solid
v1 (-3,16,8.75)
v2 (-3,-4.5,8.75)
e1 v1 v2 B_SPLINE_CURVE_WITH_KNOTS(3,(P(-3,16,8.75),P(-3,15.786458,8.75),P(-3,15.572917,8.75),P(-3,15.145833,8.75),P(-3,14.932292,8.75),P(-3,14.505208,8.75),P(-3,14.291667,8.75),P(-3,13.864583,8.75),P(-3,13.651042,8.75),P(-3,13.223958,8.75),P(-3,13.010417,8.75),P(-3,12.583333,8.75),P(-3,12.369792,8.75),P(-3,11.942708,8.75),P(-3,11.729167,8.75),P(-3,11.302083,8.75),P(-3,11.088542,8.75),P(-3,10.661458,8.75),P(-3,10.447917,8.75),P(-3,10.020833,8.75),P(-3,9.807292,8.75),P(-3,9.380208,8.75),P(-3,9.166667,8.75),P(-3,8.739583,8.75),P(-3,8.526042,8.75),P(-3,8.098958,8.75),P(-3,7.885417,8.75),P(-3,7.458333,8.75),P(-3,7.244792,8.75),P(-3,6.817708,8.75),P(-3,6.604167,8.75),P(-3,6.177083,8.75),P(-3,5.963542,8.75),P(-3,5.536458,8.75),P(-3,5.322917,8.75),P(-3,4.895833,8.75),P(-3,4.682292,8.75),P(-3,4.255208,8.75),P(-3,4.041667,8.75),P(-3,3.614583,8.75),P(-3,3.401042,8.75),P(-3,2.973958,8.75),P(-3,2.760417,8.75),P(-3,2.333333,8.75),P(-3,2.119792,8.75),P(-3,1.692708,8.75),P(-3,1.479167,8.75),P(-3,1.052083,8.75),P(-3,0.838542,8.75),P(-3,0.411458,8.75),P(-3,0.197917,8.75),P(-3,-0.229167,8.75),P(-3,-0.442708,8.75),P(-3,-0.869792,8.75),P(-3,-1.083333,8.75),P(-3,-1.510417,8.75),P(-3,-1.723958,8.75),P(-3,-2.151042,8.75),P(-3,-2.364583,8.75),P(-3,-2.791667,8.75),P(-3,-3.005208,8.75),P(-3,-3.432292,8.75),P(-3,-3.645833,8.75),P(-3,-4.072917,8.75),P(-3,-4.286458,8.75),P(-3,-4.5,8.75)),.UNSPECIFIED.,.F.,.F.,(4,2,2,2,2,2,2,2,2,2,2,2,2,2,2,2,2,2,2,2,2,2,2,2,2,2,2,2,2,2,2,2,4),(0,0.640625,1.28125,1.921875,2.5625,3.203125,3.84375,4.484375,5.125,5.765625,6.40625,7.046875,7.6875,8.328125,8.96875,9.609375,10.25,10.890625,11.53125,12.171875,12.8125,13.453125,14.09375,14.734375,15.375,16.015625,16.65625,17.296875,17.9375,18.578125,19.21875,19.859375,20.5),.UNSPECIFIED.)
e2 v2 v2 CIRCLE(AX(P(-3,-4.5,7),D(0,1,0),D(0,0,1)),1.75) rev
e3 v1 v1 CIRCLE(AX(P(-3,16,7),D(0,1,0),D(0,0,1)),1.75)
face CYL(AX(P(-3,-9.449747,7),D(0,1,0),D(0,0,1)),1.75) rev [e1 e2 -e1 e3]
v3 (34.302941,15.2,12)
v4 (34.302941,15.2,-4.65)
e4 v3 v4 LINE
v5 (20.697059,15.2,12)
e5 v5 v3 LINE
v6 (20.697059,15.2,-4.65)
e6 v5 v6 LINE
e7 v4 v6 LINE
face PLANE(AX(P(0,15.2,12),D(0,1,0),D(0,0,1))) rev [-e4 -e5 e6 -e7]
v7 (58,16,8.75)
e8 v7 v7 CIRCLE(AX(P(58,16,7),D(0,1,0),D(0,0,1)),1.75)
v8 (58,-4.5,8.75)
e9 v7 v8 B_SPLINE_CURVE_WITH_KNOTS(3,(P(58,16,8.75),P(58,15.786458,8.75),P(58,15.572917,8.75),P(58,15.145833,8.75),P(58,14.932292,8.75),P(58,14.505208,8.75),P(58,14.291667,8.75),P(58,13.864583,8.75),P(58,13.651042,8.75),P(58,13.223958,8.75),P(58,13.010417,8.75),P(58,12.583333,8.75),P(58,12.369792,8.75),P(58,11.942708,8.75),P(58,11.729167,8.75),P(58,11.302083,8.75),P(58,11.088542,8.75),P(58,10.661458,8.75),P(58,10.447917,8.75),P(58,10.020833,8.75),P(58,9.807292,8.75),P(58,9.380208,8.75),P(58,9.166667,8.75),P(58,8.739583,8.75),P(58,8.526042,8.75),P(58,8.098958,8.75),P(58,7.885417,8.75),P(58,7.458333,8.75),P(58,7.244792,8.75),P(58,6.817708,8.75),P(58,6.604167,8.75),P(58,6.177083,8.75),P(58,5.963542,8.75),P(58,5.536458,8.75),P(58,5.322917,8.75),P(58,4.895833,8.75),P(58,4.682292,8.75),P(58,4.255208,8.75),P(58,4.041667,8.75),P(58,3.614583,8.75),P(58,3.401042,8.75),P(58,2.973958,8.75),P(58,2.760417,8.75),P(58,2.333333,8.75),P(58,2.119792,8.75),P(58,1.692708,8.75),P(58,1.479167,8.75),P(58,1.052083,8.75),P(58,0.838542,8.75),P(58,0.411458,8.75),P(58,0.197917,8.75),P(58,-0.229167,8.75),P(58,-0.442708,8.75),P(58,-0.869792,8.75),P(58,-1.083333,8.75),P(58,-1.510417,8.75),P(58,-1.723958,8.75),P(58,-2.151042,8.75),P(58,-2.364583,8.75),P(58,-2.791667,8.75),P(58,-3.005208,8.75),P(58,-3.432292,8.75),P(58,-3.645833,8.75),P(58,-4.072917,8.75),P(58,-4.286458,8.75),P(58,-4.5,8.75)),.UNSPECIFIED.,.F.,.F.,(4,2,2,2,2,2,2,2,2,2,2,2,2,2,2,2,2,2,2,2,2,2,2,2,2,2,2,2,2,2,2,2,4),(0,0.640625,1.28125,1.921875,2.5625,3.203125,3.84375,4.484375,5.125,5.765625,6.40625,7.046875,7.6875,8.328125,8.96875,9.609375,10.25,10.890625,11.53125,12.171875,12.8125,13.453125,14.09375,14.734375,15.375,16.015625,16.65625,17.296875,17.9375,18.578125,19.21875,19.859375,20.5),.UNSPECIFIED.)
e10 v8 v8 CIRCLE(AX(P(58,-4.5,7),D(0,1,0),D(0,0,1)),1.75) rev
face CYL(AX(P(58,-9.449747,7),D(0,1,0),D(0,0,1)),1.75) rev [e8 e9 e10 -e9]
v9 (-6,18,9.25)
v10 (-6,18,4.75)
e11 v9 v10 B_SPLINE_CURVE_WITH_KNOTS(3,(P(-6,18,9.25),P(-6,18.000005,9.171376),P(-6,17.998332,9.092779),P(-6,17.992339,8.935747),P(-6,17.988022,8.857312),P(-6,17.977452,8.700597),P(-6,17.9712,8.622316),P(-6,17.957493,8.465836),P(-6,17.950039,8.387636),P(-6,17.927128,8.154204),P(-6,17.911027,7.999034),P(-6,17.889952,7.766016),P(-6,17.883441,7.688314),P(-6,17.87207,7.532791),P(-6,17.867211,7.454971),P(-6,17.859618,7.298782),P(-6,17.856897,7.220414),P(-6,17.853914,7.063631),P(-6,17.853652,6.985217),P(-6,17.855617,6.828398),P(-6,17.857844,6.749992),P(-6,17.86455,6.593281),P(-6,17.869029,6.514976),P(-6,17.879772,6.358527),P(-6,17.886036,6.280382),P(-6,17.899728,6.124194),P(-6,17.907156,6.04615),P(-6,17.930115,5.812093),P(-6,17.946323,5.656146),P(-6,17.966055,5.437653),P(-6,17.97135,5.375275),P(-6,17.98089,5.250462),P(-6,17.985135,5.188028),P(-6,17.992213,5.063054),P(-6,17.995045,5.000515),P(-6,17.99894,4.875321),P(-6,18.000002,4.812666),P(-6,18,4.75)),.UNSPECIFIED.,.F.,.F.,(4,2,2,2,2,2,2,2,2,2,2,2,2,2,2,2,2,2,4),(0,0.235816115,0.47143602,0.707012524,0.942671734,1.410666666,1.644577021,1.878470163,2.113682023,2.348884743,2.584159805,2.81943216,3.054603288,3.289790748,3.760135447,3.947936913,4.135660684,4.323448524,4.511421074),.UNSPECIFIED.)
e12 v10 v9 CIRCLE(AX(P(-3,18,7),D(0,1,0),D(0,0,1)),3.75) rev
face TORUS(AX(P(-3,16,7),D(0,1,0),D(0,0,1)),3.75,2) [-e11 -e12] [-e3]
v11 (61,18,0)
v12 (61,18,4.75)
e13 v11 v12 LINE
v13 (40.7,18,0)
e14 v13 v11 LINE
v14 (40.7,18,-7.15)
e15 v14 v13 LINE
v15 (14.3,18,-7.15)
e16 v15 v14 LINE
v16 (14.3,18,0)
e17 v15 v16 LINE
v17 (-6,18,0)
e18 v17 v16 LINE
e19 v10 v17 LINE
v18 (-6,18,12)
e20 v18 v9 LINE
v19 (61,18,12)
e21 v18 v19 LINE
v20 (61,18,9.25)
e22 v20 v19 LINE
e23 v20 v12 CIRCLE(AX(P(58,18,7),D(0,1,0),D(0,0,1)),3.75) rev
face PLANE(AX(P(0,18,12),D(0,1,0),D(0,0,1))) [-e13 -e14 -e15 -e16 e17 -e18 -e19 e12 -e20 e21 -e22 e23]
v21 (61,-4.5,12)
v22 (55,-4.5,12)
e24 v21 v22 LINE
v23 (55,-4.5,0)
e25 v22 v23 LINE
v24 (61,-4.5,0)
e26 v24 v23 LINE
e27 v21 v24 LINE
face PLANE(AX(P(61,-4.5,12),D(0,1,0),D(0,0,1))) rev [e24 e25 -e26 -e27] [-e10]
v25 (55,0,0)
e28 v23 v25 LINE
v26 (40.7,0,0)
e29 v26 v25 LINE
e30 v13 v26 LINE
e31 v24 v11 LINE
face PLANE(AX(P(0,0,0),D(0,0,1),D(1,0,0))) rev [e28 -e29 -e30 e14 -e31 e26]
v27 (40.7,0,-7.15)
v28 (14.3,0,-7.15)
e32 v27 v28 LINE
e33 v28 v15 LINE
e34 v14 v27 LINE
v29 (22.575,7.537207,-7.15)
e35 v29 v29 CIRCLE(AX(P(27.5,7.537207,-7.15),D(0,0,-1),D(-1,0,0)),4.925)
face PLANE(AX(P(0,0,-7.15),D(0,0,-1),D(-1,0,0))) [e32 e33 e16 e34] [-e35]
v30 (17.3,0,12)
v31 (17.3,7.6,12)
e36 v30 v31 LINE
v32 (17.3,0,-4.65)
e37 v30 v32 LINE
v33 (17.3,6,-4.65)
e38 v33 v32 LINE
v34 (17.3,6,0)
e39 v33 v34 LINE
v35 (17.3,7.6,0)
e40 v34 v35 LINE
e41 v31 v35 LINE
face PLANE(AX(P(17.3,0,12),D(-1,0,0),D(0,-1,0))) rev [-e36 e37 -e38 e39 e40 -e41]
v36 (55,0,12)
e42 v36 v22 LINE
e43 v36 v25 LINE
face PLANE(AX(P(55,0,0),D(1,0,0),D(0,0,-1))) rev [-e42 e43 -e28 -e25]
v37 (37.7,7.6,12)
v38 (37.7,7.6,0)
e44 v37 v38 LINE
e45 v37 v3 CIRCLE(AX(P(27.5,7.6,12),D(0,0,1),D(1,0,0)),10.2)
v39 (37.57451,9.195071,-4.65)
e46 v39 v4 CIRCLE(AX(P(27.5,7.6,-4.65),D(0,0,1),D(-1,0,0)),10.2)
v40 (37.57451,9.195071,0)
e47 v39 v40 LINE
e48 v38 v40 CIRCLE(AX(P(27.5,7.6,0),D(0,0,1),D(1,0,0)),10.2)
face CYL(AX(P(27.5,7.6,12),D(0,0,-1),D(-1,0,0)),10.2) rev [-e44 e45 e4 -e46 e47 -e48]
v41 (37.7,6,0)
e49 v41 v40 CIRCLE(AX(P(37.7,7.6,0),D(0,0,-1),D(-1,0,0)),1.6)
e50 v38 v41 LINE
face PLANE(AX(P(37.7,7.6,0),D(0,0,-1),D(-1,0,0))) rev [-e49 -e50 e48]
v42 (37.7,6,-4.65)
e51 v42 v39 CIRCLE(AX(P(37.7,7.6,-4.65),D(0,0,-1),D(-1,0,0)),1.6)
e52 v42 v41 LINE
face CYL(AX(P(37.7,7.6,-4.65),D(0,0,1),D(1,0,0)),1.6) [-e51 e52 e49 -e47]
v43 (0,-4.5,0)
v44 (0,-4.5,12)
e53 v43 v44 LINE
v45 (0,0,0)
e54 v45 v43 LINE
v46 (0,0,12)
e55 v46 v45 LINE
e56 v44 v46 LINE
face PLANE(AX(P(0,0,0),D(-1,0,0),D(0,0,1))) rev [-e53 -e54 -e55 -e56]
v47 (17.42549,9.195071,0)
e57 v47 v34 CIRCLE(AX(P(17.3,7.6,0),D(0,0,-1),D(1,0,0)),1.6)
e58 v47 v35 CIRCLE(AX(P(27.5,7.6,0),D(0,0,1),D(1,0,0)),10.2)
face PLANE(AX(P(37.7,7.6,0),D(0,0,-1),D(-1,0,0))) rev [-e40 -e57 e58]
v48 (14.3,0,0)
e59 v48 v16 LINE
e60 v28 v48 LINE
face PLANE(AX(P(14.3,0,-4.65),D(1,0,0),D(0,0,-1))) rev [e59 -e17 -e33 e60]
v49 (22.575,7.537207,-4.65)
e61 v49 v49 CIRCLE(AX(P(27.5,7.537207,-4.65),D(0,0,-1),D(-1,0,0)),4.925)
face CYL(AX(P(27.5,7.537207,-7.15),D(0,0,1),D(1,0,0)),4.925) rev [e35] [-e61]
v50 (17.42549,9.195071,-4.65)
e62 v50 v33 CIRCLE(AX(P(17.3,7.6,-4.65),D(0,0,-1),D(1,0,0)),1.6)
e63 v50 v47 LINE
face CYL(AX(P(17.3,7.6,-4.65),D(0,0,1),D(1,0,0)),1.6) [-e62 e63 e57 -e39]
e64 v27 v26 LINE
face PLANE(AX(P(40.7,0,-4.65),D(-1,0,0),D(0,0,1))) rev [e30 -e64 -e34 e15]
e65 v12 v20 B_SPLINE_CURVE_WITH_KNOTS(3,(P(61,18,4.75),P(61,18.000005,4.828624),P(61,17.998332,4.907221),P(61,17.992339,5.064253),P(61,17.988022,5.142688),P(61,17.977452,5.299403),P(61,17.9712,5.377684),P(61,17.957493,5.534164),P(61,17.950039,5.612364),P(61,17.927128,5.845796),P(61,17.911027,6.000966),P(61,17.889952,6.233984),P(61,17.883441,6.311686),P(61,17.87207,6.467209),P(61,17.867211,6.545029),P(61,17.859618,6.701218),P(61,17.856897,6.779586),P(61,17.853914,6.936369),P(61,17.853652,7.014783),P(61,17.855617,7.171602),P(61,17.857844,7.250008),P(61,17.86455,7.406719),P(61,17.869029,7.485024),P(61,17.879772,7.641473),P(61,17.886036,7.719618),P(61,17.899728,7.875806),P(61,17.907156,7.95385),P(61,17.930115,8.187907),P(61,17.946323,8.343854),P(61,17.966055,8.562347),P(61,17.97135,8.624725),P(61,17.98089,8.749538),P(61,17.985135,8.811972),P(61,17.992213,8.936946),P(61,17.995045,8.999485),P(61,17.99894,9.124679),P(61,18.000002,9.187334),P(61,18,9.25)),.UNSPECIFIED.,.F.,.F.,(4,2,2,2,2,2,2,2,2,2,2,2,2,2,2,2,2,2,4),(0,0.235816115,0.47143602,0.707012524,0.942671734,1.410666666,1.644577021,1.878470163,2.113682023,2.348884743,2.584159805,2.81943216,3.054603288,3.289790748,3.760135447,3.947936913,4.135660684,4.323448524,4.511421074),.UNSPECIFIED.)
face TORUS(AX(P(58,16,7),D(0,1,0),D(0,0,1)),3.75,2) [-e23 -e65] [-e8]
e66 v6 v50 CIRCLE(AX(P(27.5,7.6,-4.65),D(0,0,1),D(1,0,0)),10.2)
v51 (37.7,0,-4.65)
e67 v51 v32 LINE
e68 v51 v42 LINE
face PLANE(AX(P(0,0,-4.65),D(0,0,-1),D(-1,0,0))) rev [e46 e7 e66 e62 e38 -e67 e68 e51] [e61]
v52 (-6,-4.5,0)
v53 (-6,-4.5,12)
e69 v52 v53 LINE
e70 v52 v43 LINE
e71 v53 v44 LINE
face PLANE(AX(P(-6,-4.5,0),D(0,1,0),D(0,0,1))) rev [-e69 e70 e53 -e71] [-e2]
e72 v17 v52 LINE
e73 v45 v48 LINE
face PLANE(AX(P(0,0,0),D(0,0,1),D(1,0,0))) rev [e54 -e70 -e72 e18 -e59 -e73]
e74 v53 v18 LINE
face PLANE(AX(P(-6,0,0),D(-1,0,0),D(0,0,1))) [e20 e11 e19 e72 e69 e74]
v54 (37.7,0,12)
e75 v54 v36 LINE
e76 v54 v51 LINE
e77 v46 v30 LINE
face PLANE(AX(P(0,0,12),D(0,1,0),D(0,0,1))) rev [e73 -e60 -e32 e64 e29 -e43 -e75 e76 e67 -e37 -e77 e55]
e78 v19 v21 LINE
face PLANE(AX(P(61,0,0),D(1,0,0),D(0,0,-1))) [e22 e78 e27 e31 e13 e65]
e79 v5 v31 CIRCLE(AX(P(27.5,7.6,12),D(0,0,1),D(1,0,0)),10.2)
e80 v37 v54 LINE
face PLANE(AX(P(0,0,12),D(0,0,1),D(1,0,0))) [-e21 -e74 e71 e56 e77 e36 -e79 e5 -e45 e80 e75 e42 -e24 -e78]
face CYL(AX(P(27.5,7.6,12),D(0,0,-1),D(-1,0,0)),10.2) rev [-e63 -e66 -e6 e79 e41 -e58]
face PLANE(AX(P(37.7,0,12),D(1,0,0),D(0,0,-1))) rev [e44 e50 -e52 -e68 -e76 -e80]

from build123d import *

# Parameters (mm, degrees)
BOSS_EXTRUDE2_DEPTH = 12
SKETCH2_W           = 12
SKETCH2_H           = 22.5
BOSS_EXTRUDE3_DEPTH = 6
SKETCH3_W           = 12
SKETCH3_H           = 22.5
BOSS_EXTRUDE4_DEPTH = 6
SKETCH4_R           = 1.75
CUT_EXTRUDE1_DEPTH  = 22.5
FILLET1_R           = 2
BOSS_EXTRUDE5_START = 4.65
BOSS_EXTRUDE5_DEPTH = 4.65
SKETCH6_W           = 26.4
SKETCH6_H           = 18
SKETCH6_R           = 4.925
BOSS_EXTRUDE6_DEPTH = 2.5


with BuildPart() as part:
    # Sketch1 → Boss-Extrude2 (new body)
    with BuildSketch(Plane.XY):
        Polygon((0, 18), (0, 0), (17.3, 0), (17.3, 7.6), (17.3, 15.2), (20.697059459, 15.2), (34.302940541, 15.2), (37.7, 15.2), (37.7, 7.6), (37.7, 0), (55, 0), (55, 18), align=None)
        with BuildLine():
            Line((17.3, 15.2), (17.3, 7.6))
            ThreePointArc((17.3, 7.6), (18.187911257, 11.762331467), (20.697059459, 15.2))
            Line((20.697059459, 15.2), (17.3, 15.2))
        make_face()
        with BuildLine():
            Line((37.7, 15.2), (34.302940541, 15.2))
            ThreePointArc((34.302940541, 15.2), (36.812088743, 11.762331467), (37.7, 7.6))
            Line((37.7, 7.6), (37.7, 15.2))
        make_face()
    extrude(amount=BOSS_EXTRUDE2_DEPTH)

    # Sketch2 → Boss-Extrude3 (add)
    with BuildSketch(Plane.ZY):
        with Locations((6, 6.75)):
            Rectangle(SKETCH2_W, SKETCH2_H)
    extrude(amount=BOSS_EXTRUDE3_DEPTH)

    # Sketch3 → Boss-Extrude4 (add)
    with BuildSketch(Plane(origin=(55, 0, 0), x_dir=(0, 0, -1), z_dir=(1, 0, 0))):
        with Locations((-6, 6.75)):
            Rectangle(SKETCH3_W, SKETCH3_H)
    extrude(amount=BOSS_EXTRUDE4_DEPTH)

    # Sketch4 → Cut-Extrude1 (cut)
    with BuildSketch(Plane(origin=(0, 18, 0), x_dir=(1, 0, 0), z_dir=(0, 1, 0))):
        with Locations(Location((-3, -7, 0), (0, 0, 270))):
            Circle(SKETCH4_R)
        with Locations(Location((58, -7, 0), (0, 0, 270))):
            Circle(SKETCH4_R)
    extrude(amount=-CUT_EXTRUDE1_DEPTH, mode=Mode.SUBTRACT)

    # Fillet1
    # the kernel refuses this fillet: 2 mm, written as the material it takes off along each edge
    with BuildSketch(Plane(origin=(-3, 18, 7), x_dir=(0, 0, 1), z_dir=(-1, 0, 0))) as fillet1_piece_1:
        with BuildLine():
            CenterArc((1.75 + FILLET1_R, -FILLET1_R), FILLET1_R, 90, 90)
            Line((1.75, -FILLET1_R), (1.75, 0))
            Line((1.75, 0), (1.75 + FILLET1_R, 0))
        make_face()
    revolve(axis=Axis((-3, 18, 7), (0, 1, 0)), mode=Mode.SUBTRACT)
    with BuildSketch(Plane(origin=(58, 18, 7), x_dir=(0, 0, 1), z_dir=(-1, 0, 0))) as fillet1_piece_2:
        with BuildLine():
            CenterArc((1.75 + FILLET1_R, -FILLET1_R), FILLET1_R, 90, 90)
            Line((1.75, -FILLET1_R), (1.75, 0))
            Line((1.75, 0), (1.75 + FILLET1_R, 0))
        make_face()
    revolve(axis=Axis((58, 18, 7), (0, 1, 0)), mode=Mode.SUBTRACT)

    # Sketch5 → Boss-Extrude5 (add)
    with BuildSketch(Plane(origin=(0, 0, 0), x_dir=(-1, 0, 0), z_dir=(0, 0, -1)).offset(BOSS_EXTRUDE5_START)):
        with BuildLine():
            Line((-37.7, 0), (-40.7, 0))
            Line((-40.7, 0), (-40.7, 18))
            Line((-40.7, 18), (-14.3, 18))
            Line((-14.3, 18), (-14.3, 0))
            Line((-14.3, 0), (-17.3, 0))
            Line((-17.3, 0), (-17.3, 6))
            ThreePointArc((-17.3, 6), (-18.898767331, 7.537206525), (-17.425490196, 9.195071224))
            ThreePointArc((-17.425490196, 9.195071224), (-18.543054375, 12.47986937), (-20.697059459, 15.2))
            Line((-20.697059459, 15.2), (-34.302940541, 15.2))
            ThreePointArc((-34.302940541, 15.2), (-36.456945625, 12.47986937), (-37.574509804, 9.195071224))
            ThreePointArc((-37.574509804, 9.195071224), (-36.101232669, 7.537206525), (-37.7, 6))
            Line((-37.7, 6), (-37.7, 0))
        make_face()
    extrude(amount=-BOSS_EXTRUDE5_DEPTH)

    # Sketch6 → Boss-Extrude6 (add)
    with BuildSketch(Plane(origin=(0, 0, -4.65), x_dir=(-1, 0, 0), z_dir=(0, 0, -1))):
        with Locations((-27.5, 9)):
            Rectangle(SKETCH6_W, SKETCH6_H)
        with Locations((-27.5, 7.537206525)):
            Circle(SKETCH6_R, mode=Mode.SUBTRACT)
    extrude(amount=BOSS_EXTRUDE6_DEPTH)


solid = part.part
